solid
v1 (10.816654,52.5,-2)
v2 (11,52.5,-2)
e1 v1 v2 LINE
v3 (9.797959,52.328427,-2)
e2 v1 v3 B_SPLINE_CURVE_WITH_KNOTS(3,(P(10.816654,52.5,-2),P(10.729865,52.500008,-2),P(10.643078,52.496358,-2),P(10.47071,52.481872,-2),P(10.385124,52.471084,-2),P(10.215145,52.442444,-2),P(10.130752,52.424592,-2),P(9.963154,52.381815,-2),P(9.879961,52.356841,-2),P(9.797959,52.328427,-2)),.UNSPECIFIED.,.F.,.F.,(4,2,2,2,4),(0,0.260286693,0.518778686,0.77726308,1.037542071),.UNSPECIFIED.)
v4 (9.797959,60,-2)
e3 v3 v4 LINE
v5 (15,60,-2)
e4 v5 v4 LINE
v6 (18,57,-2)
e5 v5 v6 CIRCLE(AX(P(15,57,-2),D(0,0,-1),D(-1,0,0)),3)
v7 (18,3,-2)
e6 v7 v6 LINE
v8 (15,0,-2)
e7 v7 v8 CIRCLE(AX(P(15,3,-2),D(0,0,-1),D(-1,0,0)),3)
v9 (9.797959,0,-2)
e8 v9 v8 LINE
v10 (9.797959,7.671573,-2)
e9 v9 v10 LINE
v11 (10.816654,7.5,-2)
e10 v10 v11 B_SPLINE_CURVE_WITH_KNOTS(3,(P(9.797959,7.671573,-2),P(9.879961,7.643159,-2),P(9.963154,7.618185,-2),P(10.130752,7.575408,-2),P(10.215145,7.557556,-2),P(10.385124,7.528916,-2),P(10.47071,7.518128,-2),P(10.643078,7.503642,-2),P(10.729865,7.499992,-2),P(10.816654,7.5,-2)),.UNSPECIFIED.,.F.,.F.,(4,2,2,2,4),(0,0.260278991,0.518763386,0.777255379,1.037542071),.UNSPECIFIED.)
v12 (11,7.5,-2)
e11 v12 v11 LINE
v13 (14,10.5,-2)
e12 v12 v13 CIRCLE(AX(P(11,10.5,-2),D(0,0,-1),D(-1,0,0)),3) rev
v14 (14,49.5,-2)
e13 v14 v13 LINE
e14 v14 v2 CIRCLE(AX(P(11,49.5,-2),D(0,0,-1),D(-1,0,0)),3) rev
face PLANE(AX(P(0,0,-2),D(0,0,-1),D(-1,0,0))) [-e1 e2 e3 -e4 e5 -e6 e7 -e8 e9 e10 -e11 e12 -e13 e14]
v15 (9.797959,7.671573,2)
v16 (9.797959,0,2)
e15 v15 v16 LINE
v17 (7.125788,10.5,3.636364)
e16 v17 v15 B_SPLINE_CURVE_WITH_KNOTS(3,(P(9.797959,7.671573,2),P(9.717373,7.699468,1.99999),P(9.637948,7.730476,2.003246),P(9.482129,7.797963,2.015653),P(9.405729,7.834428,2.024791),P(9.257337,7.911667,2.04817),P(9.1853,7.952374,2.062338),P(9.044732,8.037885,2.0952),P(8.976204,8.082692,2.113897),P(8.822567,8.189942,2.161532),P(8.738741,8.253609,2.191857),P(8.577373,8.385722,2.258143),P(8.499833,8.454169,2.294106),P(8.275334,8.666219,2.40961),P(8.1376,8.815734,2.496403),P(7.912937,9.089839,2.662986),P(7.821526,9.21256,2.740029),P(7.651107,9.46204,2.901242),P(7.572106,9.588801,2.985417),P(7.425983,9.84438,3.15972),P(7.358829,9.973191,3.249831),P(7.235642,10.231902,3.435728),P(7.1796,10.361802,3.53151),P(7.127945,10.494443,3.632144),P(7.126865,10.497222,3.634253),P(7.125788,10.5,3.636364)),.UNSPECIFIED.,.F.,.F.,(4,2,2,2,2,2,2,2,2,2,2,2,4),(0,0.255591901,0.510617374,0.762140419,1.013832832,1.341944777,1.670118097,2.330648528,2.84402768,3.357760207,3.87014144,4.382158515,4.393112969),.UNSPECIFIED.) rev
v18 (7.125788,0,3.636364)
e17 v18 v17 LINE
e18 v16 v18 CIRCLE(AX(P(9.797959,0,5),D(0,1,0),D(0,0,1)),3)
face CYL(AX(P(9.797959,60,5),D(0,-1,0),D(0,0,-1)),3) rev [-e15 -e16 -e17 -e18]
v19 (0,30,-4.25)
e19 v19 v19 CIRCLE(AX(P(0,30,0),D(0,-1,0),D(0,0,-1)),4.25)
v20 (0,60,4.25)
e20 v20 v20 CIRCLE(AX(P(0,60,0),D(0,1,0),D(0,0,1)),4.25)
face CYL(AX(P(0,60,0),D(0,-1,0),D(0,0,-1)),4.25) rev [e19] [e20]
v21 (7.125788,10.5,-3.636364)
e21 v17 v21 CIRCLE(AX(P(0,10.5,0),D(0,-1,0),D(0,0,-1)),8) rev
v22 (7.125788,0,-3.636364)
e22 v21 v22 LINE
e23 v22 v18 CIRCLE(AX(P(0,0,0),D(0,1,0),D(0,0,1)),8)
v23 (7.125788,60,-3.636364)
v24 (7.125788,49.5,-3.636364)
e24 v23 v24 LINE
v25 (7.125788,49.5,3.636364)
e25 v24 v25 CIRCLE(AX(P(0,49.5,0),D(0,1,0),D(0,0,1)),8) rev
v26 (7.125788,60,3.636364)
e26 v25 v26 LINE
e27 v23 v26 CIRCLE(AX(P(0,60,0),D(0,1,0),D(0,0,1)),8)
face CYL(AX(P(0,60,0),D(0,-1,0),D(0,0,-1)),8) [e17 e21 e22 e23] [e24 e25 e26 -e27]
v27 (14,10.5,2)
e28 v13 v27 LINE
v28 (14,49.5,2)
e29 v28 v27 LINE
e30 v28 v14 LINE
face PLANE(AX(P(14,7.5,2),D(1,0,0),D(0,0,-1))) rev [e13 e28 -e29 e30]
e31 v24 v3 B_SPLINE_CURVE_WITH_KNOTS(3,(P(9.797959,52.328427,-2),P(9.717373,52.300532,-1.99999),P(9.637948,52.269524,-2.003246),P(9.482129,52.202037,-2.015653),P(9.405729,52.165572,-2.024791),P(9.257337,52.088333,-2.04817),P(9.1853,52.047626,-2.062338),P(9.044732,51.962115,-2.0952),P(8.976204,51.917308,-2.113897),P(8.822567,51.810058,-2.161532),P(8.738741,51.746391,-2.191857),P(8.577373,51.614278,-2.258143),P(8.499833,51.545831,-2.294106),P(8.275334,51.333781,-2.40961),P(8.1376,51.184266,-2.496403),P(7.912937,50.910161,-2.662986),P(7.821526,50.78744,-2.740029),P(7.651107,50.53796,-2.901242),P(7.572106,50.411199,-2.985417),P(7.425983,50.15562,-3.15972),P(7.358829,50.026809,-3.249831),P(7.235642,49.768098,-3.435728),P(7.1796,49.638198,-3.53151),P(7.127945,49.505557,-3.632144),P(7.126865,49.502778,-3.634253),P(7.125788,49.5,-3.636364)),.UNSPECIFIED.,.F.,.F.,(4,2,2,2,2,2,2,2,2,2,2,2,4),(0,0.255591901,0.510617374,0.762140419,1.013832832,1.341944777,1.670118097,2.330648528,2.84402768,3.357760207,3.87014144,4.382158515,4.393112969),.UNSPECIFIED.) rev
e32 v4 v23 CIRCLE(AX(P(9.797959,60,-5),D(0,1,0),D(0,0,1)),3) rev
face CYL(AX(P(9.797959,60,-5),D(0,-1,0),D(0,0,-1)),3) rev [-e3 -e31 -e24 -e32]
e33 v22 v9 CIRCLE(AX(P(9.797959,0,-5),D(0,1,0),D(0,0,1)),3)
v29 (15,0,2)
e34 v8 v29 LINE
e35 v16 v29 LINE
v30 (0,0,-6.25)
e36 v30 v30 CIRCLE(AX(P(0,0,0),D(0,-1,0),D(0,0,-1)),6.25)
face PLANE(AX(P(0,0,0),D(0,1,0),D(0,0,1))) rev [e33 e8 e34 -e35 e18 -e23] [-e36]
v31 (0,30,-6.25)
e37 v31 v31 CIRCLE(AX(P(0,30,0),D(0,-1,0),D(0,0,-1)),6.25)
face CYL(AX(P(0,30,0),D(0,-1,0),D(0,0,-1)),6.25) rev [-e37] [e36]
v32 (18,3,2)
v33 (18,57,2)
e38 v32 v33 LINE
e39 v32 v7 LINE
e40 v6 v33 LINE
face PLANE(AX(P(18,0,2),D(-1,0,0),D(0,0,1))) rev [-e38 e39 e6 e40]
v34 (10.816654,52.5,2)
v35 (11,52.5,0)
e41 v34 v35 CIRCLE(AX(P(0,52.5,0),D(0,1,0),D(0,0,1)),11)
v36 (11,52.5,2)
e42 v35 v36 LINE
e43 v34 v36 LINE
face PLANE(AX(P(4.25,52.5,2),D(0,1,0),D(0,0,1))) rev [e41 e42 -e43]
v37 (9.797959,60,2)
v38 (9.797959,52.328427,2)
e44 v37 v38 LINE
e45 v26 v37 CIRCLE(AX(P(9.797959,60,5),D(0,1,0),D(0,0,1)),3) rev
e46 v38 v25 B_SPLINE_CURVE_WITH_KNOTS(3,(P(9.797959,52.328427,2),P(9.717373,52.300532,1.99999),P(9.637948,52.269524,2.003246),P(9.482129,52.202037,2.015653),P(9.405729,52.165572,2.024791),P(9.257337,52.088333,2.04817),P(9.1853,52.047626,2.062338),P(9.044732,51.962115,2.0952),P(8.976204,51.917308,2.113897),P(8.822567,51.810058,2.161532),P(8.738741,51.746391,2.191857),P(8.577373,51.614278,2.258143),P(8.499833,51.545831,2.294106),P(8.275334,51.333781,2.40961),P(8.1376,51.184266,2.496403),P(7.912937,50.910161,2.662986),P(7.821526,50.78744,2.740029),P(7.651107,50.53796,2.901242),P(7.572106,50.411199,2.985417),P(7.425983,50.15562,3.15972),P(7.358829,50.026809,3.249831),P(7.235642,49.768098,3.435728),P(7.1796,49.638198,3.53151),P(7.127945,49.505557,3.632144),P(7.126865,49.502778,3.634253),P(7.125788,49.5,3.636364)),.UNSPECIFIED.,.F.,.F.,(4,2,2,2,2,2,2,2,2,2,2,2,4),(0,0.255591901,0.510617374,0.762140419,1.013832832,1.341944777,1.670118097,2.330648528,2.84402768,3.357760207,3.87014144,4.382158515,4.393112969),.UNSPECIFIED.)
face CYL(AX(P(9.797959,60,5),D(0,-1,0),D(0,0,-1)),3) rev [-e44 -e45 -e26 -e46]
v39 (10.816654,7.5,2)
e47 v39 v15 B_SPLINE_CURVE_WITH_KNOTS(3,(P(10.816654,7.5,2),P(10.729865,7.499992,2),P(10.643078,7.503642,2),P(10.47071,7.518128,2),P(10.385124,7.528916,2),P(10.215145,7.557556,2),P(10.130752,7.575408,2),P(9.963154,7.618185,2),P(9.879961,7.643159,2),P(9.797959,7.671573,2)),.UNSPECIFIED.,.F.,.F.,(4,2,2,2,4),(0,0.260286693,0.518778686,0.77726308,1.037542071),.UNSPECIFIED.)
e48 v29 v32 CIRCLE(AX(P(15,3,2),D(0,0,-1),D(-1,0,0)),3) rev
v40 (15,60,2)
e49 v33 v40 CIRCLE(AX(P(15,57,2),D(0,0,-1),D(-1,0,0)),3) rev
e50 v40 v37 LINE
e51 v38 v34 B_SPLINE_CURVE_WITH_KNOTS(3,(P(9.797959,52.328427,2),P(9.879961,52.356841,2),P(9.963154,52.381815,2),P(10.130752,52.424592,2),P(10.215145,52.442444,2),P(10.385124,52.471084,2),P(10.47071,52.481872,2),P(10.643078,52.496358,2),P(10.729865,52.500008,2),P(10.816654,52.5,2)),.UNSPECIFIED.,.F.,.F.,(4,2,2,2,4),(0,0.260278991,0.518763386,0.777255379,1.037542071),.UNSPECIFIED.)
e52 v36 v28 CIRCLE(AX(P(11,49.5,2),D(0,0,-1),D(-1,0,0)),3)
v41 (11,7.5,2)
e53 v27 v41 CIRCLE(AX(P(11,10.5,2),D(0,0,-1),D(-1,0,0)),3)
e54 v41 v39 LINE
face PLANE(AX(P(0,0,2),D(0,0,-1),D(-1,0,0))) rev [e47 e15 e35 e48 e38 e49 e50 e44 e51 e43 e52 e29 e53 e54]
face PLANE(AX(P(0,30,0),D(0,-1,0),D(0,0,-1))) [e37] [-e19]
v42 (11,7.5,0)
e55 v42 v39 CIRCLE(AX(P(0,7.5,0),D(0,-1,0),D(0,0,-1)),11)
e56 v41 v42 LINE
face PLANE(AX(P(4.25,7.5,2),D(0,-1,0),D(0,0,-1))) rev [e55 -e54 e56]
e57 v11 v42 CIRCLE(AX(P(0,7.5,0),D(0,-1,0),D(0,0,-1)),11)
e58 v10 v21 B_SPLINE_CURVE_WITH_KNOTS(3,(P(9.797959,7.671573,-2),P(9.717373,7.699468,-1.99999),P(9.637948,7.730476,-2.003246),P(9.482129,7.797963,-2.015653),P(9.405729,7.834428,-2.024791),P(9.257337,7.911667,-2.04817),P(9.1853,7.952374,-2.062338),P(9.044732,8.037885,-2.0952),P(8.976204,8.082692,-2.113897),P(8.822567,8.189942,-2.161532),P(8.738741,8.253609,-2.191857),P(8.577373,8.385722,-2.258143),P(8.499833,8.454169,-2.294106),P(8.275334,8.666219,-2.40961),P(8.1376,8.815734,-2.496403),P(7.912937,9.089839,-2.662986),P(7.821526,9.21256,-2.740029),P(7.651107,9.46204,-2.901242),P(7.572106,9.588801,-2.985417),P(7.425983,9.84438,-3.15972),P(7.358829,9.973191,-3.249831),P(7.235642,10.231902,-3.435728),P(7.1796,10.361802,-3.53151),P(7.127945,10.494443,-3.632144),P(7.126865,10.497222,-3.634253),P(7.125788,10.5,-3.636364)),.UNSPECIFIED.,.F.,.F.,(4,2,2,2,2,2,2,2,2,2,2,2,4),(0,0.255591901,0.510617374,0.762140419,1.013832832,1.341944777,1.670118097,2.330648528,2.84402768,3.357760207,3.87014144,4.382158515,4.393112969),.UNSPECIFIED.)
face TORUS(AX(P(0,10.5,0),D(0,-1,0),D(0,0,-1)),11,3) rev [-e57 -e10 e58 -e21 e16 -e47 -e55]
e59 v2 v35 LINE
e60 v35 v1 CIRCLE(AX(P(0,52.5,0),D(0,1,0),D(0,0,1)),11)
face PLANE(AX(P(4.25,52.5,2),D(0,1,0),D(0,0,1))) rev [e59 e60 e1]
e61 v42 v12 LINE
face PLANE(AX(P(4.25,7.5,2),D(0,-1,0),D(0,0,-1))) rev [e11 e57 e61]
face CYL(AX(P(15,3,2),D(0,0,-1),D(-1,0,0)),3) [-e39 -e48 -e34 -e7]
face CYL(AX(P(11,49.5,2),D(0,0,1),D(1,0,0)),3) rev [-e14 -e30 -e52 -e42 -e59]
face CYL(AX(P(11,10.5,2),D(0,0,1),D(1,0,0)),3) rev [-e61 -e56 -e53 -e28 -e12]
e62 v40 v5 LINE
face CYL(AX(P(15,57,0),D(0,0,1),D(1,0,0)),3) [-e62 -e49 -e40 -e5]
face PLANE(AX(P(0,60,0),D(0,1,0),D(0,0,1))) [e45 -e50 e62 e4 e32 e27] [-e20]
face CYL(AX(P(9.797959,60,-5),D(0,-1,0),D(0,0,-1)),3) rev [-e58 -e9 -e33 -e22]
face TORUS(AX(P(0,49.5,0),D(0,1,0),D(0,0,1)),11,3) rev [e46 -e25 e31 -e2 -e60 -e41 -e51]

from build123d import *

# Parameters (mm, degrees)
SKETCH1_R           = 8
SKETCH1_R_2         = 4.25
BOSS_EXTRUDE1_DEPTH = 60
BOSS_EXTRUDE2_DEPTH = 2
FILLET1_R           = 3
SKETCH3_R           = 6.25
CUT_EXTRUDE1_DEPTH  = 30


with BuildPart() as part:
    # Sketch1 → Boss-Extrude1 (new body)
    with BuildSketch(Plane(origin=(0, 0, 0), x_dir=(1, 0, 0), z_dir=(0, 1, 0))):
        with Locations(Location((0, 0, 0), (0, 0, 270))):
            Circle(SKETCH1_R)
        with Locations(Location((0, 0, 0), (0, 0, 270))):
            Circle(SKETCH1_R_2, mode=Mode.SUBTRACT)
    extrude(amount=BOSS_EXTRUDE1_DEPTH)

    # Sketch2 → Boss-Extrude2 (add, symmetric)
    with BuildSketch(Plane.XY):
        Polygon((18, 60), (4.25, 60), (4.25, 52.5), (14, 52.5), (14, 7.5), (4.25, 7.5), (4.25, 0), (18, 0), align=None)
    extrude(amount=BOSS_EXTRUDE2_DEPTH, both=True)

    # Fillet1
    fillet1_edges = [part.edges().sort_by_distance(p)[0] for p in [
        (7.745966692, 3.75, -2),
        (7.745966692, 3.75, 2),
        (7.745966692, 56.25, -2),
        (7.745966692, 56.25, 2),
        (18, 0, 0),
        (18, 60, 0),
        (8, 52.5, 0),
        (14, 52.5, 0),
        (8, 7.5, 0),
        (14, 7.5, 0),
    ]]
    fillet(fillet1_edges, radius=FILLET1_R - 0.0001)  # a hair under: the kernel refuses the full size

    # Sketch3 → Cut-Extrude1 (cut)
    with BuildSketch(Plane.XZ):
        with Locations(Location((0, 0, 0), (0, 0, 270))):
            Circle(SKETCH3_R)
    extrude(amount=-CUT_EXTRUDE1_DEPTH, mode=Mode.SUBTRACT)


solid = part.part
